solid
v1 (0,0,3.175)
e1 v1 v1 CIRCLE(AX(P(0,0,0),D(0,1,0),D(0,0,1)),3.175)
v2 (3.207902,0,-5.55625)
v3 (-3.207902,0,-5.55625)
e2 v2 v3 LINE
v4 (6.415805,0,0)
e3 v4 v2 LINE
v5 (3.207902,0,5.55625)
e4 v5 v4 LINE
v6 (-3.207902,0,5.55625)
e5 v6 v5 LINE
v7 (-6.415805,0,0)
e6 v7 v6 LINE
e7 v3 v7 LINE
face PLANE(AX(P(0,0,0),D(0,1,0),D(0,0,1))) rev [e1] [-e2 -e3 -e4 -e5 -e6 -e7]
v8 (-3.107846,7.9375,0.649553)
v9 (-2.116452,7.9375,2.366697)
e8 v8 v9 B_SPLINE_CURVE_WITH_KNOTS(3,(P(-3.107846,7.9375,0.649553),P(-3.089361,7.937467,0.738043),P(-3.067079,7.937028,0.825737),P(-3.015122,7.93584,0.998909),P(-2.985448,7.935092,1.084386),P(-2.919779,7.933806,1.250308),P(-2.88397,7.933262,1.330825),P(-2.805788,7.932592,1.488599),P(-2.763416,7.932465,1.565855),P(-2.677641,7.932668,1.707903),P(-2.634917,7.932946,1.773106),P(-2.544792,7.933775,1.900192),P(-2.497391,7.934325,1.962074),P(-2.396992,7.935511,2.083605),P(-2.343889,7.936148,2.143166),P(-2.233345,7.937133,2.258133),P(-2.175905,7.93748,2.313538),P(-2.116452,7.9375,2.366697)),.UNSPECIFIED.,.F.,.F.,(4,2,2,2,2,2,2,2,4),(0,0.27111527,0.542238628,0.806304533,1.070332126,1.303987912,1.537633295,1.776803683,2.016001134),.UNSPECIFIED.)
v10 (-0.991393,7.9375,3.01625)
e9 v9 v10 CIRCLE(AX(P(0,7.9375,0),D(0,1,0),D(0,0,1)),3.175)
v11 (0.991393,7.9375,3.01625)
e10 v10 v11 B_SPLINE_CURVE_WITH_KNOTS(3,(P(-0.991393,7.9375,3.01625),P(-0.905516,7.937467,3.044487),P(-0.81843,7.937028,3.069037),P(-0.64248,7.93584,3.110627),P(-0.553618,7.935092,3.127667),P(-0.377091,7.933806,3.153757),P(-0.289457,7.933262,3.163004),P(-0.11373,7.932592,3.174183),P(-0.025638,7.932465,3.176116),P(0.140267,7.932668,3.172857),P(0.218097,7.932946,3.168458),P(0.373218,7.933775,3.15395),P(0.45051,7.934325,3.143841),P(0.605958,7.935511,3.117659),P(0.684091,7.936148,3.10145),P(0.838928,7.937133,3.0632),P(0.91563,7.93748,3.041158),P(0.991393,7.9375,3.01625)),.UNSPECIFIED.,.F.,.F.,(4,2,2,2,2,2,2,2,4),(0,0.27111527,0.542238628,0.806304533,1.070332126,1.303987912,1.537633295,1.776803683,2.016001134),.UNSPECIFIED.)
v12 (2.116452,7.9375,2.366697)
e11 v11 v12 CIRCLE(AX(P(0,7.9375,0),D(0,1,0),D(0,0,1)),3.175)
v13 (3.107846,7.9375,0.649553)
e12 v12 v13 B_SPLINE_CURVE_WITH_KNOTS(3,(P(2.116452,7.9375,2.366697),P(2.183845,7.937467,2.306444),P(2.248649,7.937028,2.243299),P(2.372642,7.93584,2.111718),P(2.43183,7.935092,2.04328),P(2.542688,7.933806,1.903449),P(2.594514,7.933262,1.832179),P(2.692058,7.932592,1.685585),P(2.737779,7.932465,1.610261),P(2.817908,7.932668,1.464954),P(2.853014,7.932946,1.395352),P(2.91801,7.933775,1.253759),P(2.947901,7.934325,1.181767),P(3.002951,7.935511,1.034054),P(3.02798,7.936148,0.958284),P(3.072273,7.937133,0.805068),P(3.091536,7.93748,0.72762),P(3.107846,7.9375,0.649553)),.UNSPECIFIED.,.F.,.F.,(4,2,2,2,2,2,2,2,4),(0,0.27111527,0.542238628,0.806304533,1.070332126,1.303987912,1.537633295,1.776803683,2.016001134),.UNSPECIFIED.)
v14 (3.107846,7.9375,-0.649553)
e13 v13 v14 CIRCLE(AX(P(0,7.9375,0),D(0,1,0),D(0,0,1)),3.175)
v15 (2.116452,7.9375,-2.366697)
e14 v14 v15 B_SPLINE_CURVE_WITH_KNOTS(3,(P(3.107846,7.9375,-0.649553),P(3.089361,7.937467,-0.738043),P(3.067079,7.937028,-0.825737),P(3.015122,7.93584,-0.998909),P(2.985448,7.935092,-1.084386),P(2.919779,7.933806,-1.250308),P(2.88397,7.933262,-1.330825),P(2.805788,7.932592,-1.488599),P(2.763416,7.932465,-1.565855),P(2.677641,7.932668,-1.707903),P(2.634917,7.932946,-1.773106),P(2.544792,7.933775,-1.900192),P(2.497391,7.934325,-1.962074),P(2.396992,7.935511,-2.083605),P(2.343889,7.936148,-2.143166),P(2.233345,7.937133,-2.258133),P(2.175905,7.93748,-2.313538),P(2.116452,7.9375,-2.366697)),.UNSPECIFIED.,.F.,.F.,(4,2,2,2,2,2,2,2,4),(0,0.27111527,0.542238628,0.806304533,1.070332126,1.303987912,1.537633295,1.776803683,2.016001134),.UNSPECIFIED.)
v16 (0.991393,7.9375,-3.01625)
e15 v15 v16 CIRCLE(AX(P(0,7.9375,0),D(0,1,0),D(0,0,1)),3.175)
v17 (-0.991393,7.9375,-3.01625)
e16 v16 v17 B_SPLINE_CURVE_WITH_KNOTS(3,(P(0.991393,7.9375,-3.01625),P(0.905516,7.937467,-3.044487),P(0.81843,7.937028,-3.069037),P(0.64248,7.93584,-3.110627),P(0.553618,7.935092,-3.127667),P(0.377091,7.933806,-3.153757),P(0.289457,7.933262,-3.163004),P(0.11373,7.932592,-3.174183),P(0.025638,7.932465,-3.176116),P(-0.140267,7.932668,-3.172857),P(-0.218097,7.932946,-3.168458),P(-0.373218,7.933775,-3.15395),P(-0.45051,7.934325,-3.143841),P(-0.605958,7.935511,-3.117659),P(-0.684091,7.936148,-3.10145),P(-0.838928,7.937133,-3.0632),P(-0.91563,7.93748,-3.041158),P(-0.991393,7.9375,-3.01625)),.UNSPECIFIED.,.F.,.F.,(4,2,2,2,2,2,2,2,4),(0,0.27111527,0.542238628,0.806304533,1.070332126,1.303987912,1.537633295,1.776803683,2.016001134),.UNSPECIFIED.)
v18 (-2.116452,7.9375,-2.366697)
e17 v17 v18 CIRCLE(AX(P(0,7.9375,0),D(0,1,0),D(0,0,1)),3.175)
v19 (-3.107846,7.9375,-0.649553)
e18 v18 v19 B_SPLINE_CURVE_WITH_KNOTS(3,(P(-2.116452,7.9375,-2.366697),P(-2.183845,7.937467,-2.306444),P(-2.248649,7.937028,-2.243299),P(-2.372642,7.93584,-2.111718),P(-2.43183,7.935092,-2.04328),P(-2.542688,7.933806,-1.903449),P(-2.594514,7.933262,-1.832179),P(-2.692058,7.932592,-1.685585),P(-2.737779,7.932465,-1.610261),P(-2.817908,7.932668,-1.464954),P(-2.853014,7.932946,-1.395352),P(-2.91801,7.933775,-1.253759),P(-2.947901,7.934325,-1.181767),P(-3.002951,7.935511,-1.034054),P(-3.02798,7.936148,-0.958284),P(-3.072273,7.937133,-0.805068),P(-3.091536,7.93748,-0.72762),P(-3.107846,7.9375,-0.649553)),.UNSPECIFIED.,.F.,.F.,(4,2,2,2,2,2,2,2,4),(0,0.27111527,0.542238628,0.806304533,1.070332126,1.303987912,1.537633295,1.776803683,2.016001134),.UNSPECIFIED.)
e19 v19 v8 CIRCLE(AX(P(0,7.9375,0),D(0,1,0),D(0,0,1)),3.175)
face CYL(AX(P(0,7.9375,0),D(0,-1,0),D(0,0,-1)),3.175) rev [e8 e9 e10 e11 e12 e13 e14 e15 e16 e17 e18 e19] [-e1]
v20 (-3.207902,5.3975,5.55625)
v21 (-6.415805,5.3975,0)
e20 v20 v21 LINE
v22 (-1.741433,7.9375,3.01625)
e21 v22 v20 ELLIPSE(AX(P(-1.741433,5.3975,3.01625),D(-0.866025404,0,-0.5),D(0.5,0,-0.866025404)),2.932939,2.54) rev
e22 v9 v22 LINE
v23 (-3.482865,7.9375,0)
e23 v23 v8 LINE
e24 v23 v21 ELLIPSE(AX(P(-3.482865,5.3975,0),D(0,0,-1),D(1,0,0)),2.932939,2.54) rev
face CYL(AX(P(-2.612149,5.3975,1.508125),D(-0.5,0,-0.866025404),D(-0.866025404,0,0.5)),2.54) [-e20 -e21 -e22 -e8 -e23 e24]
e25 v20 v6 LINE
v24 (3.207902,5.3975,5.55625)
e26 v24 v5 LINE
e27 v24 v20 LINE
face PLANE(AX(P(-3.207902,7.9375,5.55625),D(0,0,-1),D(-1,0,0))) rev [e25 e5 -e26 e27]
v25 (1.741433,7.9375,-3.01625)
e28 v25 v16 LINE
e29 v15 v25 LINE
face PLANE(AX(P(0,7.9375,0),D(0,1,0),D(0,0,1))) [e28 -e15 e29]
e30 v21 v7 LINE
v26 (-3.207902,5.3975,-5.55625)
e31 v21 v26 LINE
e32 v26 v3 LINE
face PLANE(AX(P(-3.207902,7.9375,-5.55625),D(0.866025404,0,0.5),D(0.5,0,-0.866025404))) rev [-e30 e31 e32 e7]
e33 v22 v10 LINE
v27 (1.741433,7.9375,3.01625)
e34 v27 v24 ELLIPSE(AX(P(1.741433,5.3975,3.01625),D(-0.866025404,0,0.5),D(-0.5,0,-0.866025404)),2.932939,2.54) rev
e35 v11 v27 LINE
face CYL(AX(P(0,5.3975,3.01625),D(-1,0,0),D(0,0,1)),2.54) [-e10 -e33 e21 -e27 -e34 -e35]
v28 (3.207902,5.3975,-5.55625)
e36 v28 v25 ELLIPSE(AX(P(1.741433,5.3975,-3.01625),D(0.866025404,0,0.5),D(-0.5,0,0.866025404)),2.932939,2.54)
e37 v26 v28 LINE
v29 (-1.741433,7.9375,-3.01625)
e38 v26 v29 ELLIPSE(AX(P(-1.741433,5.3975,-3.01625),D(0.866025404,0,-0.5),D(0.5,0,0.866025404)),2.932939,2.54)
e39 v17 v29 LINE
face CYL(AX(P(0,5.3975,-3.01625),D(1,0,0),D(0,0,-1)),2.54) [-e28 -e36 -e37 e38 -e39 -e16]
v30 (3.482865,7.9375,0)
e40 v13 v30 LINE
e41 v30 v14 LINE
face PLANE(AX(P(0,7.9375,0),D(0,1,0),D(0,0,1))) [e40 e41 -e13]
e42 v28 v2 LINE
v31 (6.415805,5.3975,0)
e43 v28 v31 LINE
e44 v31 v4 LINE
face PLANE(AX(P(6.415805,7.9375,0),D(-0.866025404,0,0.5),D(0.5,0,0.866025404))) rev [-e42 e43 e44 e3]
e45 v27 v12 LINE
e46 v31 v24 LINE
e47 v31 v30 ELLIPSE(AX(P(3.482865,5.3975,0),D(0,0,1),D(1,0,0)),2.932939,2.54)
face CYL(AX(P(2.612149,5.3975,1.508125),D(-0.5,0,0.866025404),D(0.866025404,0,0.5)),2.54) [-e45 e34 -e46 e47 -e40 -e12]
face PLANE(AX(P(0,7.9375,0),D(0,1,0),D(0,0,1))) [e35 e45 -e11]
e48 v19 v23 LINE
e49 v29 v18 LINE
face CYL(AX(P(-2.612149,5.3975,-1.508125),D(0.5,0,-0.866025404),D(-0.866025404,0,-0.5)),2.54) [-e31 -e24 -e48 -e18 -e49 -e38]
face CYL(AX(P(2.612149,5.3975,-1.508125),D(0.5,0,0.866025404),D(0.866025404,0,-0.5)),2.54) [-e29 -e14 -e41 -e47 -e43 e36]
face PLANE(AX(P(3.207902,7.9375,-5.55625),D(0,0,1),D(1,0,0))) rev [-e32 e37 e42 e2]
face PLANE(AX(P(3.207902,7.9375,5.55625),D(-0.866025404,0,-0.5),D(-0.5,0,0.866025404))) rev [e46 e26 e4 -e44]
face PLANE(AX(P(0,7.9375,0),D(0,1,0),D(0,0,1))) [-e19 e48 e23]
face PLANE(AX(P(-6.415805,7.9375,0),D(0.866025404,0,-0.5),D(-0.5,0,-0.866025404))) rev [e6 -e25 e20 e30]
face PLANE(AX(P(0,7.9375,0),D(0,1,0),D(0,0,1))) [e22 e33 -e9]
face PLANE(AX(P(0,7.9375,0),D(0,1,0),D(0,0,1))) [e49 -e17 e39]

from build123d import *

# Parameters (mm, degrees)
SKETCH1_R           = 3.175
BOSS_EXTRUDE1_DEPTH = 7.9375
FILLET1_R           = 2.54


with BuildPart() as part:
    # Sketch1 → Boss-Extrude1 (new body)
    with BuildSketch(Plane(origin=(0, 0, 0), x_dir=(1, 0, 0), z_dir=(0, 1, 0))):
        Polygon((-6.415804866, 0), (-3.207902433, -5.55625), (3.207902433, -5.55625), (6.415804866, 0), (3.207902433, 5.55625), (-3.207902433, 5.55625), align=None)
        with Locations(Location((0, 0, 0), (0, 0, 270))):
            Circle(SKETCH1_R, mode=Mode.SUBTRACT)
    extrude(amount=BOSS_EXTRUDE1_DEPTH)

    # Fillet1
    # the kernel refuses this fillet: 2.54 mm, written as the material it takes off along each edge
    with BuildSketch(Plane(origin=(-9.557902433, 7.9375, 5.55625), x_dir=(0, -1, 0), z_dir=(1, 0, 0)), Plane(origin=(0.032902433, 7.9375, 11.055511314), x_dir=(0, -1, 0), z_dir=(0.49999999999999967, 0, -0.8660254037844389)), Plane(origin=(9.590804866, 7.9375, 5.499261314), x_dir=(0, -1, 0), z_dir=(-0.5000000000000002, 0, -0.8660254037844386)), Plane(origin=(9.557902433, 7.9375, -5.55625), x_dir=(0, -1, 0), z_dir=(-1, 0, 0)), Plane(origin=(-0.032902433, 7.9375, -11.055511314), x_dir=(0, -1, 0), z_dir=(-0.49999999999999983, 0, 0.8660254037844388)), Plane(origin=(-9.590804866, 7.9375, -5.499261314), x_dir=(0, -1, 0), z_dir=(0.5000000000000001, 0, 0.8660254037844386))) as fillet1_piece_1:
        with BuildLine():
            CenterArc((FILLET1_R, FILLET1_R), FILLET1_R, 180, 90)
            Line((0, FILLET1_R), (0, 0))
            Line((0, 0), (FILLET1_R, 0))
        make_face()
    extrude(amount=19.115804866, mode=Mode.SUBTRACT)


solid = part.part
